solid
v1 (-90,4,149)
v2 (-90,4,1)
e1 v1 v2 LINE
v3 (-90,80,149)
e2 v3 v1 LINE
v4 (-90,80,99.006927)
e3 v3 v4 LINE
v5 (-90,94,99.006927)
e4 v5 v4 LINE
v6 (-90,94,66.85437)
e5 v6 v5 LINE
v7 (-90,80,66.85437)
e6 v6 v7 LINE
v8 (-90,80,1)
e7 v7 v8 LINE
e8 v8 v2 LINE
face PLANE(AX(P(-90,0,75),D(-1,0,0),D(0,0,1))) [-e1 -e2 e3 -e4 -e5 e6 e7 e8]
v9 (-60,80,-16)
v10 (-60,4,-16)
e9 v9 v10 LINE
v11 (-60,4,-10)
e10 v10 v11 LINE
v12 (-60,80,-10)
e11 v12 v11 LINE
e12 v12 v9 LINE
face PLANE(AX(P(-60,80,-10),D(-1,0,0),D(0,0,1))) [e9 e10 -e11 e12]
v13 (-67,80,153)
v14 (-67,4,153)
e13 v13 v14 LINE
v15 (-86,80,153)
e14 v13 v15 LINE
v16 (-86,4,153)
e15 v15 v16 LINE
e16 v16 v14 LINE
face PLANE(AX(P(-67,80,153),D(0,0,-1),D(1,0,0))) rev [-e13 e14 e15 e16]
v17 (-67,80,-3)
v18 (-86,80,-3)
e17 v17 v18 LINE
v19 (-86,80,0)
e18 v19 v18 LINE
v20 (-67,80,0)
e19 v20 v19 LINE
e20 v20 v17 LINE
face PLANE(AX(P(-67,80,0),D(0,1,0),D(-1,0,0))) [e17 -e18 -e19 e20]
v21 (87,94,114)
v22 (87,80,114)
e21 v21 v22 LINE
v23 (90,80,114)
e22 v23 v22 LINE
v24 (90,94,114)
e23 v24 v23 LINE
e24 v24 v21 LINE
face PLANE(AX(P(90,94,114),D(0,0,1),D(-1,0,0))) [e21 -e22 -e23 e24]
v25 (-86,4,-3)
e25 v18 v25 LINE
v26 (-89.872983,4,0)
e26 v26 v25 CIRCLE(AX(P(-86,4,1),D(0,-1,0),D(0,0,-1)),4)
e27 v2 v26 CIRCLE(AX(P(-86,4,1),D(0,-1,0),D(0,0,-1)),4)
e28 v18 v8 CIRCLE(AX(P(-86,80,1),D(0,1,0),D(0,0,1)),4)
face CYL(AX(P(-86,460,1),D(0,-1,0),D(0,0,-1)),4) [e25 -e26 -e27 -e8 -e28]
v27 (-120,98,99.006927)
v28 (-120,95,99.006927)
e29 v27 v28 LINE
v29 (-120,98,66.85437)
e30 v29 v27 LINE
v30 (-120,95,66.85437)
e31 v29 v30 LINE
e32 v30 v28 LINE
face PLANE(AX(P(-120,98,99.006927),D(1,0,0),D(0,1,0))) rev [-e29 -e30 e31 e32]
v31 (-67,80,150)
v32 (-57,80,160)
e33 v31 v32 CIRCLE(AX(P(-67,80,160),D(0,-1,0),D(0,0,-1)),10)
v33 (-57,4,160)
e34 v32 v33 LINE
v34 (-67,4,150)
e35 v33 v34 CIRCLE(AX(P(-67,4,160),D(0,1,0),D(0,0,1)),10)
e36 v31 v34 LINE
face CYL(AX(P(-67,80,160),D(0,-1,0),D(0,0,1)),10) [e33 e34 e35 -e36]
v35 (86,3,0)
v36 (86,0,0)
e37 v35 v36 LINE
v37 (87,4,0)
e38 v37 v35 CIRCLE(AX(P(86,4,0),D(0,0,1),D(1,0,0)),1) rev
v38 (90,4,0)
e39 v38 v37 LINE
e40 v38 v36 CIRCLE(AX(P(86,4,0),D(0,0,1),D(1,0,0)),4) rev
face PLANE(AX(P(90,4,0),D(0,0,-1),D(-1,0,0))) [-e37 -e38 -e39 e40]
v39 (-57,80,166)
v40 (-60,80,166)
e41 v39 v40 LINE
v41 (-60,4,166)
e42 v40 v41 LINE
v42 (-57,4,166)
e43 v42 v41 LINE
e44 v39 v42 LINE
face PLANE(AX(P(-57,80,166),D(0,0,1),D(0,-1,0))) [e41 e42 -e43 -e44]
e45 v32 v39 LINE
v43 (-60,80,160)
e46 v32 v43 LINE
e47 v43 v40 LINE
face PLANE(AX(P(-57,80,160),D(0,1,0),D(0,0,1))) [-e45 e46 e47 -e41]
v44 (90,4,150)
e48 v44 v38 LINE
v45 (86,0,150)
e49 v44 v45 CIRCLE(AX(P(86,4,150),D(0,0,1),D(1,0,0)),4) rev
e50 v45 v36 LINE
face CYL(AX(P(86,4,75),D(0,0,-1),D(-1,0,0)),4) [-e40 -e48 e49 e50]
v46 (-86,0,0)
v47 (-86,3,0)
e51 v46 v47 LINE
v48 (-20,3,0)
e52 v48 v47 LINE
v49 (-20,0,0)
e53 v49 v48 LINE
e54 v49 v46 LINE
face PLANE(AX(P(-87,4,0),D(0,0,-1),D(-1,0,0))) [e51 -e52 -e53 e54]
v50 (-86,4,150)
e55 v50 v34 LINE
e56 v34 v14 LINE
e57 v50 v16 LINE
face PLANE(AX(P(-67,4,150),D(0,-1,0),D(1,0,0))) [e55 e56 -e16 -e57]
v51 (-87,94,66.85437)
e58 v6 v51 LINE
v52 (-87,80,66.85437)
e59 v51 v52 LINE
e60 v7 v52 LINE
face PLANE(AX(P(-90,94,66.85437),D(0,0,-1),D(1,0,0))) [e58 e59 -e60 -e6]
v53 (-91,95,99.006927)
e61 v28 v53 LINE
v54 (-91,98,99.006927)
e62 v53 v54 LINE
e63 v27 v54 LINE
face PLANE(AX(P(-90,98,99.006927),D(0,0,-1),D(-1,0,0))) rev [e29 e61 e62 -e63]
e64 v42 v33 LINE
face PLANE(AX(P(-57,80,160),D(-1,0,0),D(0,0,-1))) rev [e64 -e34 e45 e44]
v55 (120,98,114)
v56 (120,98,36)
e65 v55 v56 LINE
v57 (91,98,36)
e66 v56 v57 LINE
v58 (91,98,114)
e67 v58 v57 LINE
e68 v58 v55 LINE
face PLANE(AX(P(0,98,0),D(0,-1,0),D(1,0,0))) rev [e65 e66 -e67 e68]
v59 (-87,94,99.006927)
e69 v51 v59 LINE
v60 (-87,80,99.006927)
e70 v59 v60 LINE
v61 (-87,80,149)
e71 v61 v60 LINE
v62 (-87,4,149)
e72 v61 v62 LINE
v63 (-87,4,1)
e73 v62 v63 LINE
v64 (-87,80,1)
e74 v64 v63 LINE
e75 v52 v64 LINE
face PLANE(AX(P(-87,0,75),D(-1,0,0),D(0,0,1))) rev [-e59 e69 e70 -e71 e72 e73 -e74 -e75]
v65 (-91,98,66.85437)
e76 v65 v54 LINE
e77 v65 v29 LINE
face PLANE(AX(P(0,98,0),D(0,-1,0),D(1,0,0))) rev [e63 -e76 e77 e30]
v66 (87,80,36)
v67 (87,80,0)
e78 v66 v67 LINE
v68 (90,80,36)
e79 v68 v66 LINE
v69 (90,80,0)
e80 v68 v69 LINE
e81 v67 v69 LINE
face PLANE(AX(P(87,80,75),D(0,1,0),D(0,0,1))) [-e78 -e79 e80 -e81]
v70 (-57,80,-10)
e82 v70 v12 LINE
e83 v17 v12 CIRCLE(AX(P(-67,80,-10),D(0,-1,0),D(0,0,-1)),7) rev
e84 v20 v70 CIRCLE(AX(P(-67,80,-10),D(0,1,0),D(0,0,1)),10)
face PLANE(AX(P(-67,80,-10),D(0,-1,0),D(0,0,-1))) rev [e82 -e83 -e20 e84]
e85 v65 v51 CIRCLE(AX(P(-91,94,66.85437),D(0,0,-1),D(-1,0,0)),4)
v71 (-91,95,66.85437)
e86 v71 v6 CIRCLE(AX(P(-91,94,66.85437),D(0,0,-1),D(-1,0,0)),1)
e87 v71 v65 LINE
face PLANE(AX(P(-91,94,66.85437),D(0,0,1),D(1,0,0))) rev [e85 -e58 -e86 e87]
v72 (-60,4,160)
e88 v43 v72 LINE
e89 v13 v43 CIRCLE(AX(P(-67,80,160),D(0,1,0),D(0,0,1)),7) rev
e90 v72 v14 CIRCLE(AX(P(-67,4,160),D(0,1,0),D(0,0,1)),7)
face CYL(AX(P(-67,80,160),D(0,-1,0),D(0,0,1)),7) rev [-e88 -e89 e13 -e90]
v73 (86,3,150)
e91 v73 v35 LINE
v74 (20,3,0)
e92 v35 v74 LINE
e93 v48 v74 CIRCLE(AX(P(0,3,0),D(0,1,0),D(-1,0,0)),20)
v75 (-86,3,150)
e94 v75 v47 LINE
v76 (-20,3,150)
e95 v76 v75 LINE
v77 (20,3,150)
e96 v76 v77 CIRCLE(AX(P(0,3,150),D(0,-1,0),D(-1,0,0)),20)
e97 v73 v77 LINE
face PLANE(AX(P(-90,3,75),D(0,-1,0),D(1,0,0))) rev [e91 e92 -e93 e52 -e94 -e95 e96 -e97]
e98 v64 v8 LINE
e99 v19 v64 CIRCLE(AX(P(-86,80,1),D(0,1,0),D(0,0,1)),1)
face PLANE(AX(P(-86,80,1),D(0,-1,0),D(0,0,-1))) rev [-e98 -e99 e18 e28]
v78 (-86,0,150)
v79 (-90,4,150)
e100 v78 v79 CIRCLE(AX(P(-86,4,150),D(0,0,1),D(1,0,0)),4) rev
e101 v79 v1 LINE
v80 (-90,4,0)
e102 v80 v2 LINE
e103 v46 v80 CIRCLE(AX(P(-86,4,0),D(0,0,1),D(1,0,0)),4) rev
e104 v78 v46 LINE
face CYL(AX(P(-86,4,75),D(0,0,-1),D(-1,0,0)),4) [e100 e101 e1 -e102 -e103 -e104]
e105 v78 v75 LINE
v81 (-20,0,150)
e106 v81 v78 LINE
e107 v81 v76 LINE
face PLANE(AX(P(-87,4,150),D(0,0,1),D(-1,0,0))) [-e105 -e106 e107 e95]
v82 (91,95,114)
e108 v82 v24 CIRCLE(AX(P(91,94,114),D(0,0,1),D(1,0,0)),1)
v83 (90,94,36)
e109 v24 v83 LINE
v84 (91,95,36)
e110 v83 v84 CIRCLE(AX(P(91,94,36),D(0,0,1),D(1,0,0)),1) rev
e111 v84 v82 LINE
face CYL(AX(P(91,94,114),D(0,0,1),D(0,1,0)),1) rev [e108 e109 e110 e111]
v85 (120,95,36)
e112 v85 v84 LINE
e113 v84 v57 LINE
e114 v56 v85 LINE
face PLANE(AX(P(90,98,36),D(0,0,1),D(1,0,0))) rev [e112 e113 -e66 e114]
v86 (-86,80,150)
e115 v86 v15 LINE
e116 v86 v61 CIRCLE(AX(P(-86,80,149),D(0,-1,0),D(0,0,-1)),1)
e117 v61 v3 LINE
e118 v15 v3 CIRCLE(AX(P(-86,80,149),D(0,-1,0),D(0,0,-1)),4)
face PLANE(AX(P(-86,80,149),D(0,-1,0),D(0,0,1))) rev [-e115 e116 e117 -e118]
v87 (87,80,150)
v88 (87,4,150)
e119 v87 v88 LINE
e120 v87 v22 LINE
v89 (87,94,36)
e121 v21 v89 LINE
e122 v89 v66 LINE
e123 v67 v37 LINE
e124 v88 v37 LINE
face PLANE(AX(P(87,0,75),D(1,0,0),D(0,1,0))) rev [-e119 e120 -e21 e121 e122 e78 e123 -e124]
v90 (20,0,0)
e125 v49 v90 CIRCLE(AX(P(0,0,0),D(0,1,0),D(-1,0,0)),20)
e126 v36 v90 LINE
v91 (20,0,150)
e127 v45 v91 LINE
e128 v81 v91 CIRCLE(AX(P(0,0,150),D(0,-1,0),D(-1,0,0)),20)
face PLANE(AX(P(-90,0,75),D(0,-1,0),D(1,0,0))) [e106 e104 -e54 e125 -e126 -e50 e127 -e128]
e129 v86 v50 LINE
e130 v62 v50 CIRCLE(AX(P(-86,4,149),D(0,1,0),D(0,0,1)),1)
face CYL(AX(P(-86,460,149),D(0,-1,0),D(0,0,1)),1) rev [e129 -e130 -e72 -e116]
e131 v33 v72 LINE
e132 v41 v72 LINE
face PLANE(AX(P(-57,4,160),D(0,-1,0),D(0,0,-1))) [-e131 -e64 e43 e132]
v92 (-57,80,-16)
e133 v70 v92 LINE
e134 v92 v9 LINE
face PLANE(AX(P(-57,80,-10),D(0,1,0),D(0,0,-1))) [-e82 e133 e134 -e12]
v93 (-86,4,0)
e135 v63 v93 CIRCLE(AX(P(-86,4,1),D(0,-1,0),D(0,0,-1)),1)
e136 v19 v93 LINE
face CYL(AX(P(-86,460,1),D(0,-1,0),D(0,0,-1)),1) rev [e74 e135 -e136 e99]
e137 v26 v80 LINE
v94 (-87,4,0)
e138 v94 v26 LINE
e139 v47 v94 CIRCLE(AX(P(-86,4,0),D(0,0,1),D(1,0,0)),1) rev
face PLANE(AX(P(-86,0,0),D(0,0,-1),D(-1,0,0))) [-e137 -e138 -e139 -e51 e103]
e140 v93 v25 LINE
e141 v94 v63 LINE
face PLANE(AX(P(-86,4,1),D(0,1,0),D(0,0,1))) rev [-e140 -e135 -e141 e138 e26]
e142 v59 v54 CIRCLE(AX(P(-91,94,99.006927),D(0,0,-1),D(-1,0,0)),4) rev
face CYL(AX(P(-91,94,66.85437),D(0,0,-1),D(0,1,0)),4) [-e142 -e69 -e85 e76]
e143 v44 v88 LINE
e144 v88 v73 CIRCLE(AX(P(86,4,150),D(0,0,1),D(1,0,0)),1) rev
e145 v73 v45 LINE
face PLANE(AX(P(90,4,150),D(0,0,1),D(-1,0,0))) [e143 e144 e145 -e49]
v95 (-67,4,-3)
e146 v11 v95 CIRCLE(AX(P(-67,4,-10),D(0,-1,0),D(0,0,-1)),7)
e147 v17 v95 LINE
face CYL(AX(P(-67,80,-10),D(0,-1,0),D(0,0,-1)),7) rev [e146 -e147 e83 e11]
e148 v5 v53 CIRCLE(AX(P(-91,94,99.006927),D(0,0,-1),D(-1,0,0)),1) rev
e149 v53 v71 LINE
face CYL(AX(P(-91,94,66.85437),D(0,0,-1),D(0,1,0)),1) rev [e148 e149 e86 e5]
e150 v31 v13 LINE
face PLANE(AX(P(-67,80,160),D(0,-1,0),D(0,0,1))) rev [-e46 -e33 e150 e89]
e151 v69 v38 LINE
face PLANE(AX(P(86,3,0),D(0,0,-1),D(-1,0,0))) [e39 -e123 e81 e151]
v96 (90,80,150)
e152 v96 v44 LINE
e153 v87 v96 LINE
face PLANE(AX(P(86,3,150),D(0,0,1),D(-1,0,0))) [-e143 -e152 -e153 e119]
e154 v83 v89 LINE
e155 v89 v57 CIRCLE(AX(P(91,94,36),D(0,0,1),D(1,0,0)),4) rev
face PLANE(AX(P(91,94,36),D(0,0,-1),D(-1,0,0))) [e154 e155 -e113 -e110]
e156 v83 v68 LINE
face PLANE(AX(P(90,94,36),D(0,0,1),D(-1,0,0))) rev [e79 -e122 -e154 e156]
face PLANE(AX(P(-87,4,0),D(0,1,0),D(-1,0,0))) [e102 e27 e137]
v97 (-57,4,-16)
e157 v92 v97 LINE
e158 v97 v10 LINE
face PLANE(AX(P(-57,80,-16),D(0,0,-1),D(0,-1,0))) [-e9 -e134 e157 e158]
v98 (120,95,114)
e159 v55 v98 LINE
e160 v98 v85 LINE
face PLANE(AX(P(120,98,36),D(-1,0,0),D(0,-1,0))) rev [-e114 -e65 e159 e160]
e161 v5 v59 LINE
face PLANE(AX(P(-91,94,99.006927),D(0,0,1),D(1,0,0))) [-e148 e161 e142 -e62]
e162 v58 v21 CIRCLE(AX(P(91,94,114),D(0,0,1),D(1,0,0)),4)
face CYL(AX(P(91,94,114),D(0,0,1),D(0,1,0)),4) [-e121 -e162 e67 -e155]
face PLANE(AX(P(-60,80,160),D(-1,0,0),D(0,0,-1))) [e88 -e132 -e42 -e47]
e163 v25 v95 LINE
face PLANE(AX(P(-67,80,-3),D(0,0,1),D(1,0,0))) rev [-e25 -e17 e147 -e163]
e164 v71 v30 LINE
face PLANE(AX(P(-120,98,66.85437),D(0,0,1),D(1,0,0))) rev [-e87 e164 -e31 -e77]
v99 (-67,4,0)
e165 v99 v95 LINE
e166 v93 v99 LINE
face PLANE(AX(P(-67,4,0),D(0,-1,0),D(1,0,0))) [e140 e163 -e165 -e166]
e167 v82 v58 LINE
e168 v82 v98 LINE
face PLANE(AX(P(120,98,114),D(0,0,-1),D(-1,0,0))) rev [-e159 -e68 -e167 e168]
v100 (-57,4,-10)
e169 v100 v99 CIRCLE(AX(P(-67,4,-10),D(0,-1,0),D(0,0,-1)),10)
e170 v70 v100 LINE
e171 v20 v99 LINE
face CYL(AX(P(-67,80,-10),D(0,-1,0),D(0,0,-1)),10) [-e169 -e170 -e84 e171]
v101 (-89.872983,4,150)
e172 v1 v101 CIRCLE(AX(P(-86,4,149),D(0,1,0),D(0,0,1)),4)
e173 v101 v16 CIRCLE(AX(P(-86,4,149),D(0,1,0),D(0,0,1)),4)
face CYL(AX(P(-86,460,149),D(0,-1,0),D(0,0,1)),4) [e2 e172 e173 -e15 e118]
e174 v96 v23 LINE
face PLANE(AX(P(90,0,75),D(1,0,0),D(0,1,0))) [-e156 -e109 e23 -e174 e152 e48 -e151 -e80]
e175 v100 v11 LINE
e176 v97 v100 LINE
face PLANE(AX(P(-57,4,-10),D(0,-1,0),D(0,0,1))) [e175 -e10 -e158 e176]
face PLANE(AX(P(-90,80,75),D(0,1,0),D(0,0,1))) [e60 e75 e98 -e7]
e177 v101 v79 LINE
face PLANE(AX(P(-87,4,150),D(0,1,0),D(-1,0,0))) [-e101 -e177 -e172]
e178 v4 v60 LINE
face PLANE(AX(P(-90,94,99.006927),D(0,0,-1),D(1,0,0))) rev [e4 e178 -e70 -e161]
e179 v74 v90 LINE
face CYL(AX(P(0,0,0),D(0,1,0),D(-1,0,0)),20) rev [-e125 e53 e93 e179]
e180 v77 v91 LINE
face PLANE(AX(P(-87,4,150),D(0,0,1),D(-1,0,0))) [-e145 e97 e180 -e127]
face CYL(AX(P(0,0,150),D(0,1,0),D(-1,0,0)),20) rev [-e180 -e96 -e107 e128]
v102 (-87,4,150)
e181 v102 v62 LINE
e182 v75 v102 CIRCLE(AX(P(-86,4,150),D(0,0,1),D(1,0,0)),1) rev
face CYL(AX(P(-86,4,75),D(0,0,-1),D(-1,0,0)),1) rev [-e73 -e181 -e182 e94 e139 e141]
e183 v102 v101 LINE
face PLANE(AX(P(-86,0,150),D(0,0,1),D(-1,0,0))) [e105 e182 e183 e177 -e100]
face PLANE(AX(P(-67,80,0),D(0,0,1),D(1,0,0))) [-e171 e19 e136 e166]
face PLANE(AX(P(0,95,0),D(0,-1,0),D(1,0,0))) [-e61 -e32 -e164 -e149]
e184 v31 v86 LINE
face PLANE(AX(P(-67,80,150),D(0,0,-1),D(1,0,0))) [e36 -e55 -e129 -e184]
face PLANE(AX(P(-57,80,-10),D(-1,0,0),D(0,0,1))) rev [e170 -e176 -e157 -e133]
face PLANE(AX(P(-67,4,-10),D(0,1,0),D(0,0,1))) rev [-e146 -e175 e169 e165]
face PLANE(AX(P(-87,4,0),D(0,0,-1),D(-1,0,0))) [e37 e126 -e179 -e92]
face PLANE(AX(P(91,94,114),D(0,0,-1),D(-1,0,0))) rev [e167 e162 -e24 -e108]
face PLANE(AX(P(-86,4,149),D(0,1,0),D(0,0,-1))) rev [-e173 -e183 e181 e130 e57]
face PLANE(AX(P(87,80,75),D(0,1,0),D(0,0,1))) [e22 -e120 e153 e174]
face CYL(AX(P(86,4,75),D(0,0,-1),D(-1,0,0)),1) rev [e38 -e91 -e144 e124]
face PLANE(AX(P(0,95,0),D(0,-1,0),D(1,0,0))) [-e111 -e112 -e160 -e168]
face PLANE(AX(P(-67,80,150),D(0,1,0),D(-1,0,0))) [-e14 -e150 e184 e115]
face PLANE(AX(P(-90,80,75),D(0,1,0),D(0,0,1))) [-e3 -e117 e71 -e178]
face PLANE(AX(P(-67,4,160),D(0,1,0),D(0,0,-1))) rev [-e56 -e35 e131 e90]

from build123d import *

# Parameters (mm, degrees)
BASE_FLANGE1_DEPTH      = 75
SKETCH4_R               = 20
CUT_EXTRUDE1_DEPTH      = 3
MITER_START             = 4
MITER_FLANGE1_DEPTH     = 76
MITER_FLANGE1_2_DEPTH   = 76
EDGE_FLANGE1_DEPTH      = 78
EDGE_FLANGE1_BEND_DEPTH = 32.152557442


# Read off the part's stored shape, not the designer's step: Miter Flange1
# Sheet-metal steps are written as plain solids
with BuildPart() as part:
    # Sketch1 → Base-Flange1 (new body)
    with BuildSketch(Plane.XY):
        with BuildLine():
            Line((-90, 80), (-90, 4))
            ThreePointArc((-90, 4), (-88.828427125, 1.171572875), (-86, 0))
            Line((-86, 0), (86, 0))
            ThreePointArc((86, 0), (88.828427125, 1.171572875), (90, 4))
            Line((90, 4), (90, 80))
            Line((90, 80), (87, 80))
            Line((87, 80), (87, 4))
            ThreePointArc((87, 4), (86.707106781, 3.292893219), (86, 3))
            Line((86, 3), (-86, 3))
            ThreePointArc((-86, 3), (-86.707106781, 3.292893219), (-87, 4))
            Line((-87, 4), (-87, 80))
            Line((-87, 80), (-90, 80))
        make_face()
    extrude(amount=BASE_FLANGE1_DEPTH)

    # Sketch4 → Cut-Extrude1 (cut)
    with BuildSketch(Plane(origin=(0, 3, 0), x_dir=(1, 0, 0), z_dir=(0, 1, 0))):
        Circle(SKETCH4_R)
    extrude(amount=-CUT_EXTRUDE1_DEPTH, mode=Mode.SUBTRACT)

    # Miter Flange1 outline → Miter Flange1 (cut)
    with BuildSketch(Plane(origin=(0, 0, 0), x_dir=(1, 0, 0), z_dir=(0, 1, 0)).offset(MITER_START)):
        with BuildLine():
            ThreePointArc((-90, -1), (-89.968118785, -0.49598283), (-89.872983346, 0))
            Line((-89.872983346, 0), (-90, 0))
            Line((-90, 0), (-90, -1))
        make_face()
    extrude(amount=MITER_FLANGE1_DEPTH, mode=Mode.SUBTRACT)

    # Miter Flange1 2 outline → Miter Flange1 2 (add)
    with BuildSketch(Plane(origin=(0, 0, 0), x_dir=(1, 0, 0), z_dir=(0, 1, 0)).offset(MITER_START)):
        with BuildLine():
            Line((-57, 10), (-57, 16))
            Line((-57, 16), (-60, 16))
            Line((-60, 16), (-60, 10))
            ThreePointArc((-60, 10), (-62.050252532, 5.050252532), (-67, 3))
            Line((-67, 3), (-86, 3))
            ThreePointArc((-86, 3), (-88.449489743, 2.16227766), (-89.872983346, 0))
            Line((-89.872983346, 0), (-87, 0))
            Line((-87, 0), (-87, -1))
            ThreePointArc((-87, -1), (-86.707106781, -0.292893219), (-86, 0))
            Line((-86, 0), (-67, 0))
            ThreePointArc((-67, 0), (-59.928932188, 2.928932188), (-57, 10))
        make_face()
    extrude(amount=MITER_FLANGE1_2_DEPTH)

    # Mirror1: part across plane


with BuildPart() as part_1:
    add(part.part)
    add(part.part.mirror(Plane(origin=(87, 4, 75), x_dir=(1, 0, 0), z_dir=(0, 0, 1))))

    # Edge-Flange1 section (across the edge) → Edge-Flange1 (add)
    with BuildSketch(Plane(origin=(90, 95, 36), x_dir=(0, -1, 0), z_dir=(0, 0, 1))):
        with BuildLine():
            Line((-3, 1), (-3, 30))
            Line((-3, 30), (0, 30))
            Line((0, 30), (0, 1))
            ThreePointArc((0, 1), (0.292893219, 0.292893219), (1, 0))
            Line((1, 0), (15, 0))
            Line((15, 0), (15, -3))
            Line((15, -3), (1, -3))
            ThreePointArc((1, -3), (-1.828427125, -1.828427125), (-3, 1))
        make_face()
    extrude(amount=EDGE_FLANGE1_DEPTH)

    # Edge-Flange1 section 2 (across the edge) → Edge-Flange1 bend (add)
    with BuildSketch(Plane(origin=(-90, 95, 99.006927285), x_dir=(0, -1, 0), z_dir=(0, 0, -1))):
        with BuildLine():
            Line((-3, 1), (-3, 30))
            Line((-3, 30), (0, 30))
            Line((0, 30), (0, 1))
            ThreePointArc((0, 1), (0.292893219, 0.292893219), (1, 0))
            Line((1, 0), (15, 0))
            Line((15, 0), (15, -3))
            Line((15, -3), (1, -3))
            ThreePointArc((1, -3), (-1.828427125, -1.828427125), (-3, 1))
        make_face()
    extrude(amount=EDGE_FLANGE1_BEND_DEPTH)


solid = part_1.part
